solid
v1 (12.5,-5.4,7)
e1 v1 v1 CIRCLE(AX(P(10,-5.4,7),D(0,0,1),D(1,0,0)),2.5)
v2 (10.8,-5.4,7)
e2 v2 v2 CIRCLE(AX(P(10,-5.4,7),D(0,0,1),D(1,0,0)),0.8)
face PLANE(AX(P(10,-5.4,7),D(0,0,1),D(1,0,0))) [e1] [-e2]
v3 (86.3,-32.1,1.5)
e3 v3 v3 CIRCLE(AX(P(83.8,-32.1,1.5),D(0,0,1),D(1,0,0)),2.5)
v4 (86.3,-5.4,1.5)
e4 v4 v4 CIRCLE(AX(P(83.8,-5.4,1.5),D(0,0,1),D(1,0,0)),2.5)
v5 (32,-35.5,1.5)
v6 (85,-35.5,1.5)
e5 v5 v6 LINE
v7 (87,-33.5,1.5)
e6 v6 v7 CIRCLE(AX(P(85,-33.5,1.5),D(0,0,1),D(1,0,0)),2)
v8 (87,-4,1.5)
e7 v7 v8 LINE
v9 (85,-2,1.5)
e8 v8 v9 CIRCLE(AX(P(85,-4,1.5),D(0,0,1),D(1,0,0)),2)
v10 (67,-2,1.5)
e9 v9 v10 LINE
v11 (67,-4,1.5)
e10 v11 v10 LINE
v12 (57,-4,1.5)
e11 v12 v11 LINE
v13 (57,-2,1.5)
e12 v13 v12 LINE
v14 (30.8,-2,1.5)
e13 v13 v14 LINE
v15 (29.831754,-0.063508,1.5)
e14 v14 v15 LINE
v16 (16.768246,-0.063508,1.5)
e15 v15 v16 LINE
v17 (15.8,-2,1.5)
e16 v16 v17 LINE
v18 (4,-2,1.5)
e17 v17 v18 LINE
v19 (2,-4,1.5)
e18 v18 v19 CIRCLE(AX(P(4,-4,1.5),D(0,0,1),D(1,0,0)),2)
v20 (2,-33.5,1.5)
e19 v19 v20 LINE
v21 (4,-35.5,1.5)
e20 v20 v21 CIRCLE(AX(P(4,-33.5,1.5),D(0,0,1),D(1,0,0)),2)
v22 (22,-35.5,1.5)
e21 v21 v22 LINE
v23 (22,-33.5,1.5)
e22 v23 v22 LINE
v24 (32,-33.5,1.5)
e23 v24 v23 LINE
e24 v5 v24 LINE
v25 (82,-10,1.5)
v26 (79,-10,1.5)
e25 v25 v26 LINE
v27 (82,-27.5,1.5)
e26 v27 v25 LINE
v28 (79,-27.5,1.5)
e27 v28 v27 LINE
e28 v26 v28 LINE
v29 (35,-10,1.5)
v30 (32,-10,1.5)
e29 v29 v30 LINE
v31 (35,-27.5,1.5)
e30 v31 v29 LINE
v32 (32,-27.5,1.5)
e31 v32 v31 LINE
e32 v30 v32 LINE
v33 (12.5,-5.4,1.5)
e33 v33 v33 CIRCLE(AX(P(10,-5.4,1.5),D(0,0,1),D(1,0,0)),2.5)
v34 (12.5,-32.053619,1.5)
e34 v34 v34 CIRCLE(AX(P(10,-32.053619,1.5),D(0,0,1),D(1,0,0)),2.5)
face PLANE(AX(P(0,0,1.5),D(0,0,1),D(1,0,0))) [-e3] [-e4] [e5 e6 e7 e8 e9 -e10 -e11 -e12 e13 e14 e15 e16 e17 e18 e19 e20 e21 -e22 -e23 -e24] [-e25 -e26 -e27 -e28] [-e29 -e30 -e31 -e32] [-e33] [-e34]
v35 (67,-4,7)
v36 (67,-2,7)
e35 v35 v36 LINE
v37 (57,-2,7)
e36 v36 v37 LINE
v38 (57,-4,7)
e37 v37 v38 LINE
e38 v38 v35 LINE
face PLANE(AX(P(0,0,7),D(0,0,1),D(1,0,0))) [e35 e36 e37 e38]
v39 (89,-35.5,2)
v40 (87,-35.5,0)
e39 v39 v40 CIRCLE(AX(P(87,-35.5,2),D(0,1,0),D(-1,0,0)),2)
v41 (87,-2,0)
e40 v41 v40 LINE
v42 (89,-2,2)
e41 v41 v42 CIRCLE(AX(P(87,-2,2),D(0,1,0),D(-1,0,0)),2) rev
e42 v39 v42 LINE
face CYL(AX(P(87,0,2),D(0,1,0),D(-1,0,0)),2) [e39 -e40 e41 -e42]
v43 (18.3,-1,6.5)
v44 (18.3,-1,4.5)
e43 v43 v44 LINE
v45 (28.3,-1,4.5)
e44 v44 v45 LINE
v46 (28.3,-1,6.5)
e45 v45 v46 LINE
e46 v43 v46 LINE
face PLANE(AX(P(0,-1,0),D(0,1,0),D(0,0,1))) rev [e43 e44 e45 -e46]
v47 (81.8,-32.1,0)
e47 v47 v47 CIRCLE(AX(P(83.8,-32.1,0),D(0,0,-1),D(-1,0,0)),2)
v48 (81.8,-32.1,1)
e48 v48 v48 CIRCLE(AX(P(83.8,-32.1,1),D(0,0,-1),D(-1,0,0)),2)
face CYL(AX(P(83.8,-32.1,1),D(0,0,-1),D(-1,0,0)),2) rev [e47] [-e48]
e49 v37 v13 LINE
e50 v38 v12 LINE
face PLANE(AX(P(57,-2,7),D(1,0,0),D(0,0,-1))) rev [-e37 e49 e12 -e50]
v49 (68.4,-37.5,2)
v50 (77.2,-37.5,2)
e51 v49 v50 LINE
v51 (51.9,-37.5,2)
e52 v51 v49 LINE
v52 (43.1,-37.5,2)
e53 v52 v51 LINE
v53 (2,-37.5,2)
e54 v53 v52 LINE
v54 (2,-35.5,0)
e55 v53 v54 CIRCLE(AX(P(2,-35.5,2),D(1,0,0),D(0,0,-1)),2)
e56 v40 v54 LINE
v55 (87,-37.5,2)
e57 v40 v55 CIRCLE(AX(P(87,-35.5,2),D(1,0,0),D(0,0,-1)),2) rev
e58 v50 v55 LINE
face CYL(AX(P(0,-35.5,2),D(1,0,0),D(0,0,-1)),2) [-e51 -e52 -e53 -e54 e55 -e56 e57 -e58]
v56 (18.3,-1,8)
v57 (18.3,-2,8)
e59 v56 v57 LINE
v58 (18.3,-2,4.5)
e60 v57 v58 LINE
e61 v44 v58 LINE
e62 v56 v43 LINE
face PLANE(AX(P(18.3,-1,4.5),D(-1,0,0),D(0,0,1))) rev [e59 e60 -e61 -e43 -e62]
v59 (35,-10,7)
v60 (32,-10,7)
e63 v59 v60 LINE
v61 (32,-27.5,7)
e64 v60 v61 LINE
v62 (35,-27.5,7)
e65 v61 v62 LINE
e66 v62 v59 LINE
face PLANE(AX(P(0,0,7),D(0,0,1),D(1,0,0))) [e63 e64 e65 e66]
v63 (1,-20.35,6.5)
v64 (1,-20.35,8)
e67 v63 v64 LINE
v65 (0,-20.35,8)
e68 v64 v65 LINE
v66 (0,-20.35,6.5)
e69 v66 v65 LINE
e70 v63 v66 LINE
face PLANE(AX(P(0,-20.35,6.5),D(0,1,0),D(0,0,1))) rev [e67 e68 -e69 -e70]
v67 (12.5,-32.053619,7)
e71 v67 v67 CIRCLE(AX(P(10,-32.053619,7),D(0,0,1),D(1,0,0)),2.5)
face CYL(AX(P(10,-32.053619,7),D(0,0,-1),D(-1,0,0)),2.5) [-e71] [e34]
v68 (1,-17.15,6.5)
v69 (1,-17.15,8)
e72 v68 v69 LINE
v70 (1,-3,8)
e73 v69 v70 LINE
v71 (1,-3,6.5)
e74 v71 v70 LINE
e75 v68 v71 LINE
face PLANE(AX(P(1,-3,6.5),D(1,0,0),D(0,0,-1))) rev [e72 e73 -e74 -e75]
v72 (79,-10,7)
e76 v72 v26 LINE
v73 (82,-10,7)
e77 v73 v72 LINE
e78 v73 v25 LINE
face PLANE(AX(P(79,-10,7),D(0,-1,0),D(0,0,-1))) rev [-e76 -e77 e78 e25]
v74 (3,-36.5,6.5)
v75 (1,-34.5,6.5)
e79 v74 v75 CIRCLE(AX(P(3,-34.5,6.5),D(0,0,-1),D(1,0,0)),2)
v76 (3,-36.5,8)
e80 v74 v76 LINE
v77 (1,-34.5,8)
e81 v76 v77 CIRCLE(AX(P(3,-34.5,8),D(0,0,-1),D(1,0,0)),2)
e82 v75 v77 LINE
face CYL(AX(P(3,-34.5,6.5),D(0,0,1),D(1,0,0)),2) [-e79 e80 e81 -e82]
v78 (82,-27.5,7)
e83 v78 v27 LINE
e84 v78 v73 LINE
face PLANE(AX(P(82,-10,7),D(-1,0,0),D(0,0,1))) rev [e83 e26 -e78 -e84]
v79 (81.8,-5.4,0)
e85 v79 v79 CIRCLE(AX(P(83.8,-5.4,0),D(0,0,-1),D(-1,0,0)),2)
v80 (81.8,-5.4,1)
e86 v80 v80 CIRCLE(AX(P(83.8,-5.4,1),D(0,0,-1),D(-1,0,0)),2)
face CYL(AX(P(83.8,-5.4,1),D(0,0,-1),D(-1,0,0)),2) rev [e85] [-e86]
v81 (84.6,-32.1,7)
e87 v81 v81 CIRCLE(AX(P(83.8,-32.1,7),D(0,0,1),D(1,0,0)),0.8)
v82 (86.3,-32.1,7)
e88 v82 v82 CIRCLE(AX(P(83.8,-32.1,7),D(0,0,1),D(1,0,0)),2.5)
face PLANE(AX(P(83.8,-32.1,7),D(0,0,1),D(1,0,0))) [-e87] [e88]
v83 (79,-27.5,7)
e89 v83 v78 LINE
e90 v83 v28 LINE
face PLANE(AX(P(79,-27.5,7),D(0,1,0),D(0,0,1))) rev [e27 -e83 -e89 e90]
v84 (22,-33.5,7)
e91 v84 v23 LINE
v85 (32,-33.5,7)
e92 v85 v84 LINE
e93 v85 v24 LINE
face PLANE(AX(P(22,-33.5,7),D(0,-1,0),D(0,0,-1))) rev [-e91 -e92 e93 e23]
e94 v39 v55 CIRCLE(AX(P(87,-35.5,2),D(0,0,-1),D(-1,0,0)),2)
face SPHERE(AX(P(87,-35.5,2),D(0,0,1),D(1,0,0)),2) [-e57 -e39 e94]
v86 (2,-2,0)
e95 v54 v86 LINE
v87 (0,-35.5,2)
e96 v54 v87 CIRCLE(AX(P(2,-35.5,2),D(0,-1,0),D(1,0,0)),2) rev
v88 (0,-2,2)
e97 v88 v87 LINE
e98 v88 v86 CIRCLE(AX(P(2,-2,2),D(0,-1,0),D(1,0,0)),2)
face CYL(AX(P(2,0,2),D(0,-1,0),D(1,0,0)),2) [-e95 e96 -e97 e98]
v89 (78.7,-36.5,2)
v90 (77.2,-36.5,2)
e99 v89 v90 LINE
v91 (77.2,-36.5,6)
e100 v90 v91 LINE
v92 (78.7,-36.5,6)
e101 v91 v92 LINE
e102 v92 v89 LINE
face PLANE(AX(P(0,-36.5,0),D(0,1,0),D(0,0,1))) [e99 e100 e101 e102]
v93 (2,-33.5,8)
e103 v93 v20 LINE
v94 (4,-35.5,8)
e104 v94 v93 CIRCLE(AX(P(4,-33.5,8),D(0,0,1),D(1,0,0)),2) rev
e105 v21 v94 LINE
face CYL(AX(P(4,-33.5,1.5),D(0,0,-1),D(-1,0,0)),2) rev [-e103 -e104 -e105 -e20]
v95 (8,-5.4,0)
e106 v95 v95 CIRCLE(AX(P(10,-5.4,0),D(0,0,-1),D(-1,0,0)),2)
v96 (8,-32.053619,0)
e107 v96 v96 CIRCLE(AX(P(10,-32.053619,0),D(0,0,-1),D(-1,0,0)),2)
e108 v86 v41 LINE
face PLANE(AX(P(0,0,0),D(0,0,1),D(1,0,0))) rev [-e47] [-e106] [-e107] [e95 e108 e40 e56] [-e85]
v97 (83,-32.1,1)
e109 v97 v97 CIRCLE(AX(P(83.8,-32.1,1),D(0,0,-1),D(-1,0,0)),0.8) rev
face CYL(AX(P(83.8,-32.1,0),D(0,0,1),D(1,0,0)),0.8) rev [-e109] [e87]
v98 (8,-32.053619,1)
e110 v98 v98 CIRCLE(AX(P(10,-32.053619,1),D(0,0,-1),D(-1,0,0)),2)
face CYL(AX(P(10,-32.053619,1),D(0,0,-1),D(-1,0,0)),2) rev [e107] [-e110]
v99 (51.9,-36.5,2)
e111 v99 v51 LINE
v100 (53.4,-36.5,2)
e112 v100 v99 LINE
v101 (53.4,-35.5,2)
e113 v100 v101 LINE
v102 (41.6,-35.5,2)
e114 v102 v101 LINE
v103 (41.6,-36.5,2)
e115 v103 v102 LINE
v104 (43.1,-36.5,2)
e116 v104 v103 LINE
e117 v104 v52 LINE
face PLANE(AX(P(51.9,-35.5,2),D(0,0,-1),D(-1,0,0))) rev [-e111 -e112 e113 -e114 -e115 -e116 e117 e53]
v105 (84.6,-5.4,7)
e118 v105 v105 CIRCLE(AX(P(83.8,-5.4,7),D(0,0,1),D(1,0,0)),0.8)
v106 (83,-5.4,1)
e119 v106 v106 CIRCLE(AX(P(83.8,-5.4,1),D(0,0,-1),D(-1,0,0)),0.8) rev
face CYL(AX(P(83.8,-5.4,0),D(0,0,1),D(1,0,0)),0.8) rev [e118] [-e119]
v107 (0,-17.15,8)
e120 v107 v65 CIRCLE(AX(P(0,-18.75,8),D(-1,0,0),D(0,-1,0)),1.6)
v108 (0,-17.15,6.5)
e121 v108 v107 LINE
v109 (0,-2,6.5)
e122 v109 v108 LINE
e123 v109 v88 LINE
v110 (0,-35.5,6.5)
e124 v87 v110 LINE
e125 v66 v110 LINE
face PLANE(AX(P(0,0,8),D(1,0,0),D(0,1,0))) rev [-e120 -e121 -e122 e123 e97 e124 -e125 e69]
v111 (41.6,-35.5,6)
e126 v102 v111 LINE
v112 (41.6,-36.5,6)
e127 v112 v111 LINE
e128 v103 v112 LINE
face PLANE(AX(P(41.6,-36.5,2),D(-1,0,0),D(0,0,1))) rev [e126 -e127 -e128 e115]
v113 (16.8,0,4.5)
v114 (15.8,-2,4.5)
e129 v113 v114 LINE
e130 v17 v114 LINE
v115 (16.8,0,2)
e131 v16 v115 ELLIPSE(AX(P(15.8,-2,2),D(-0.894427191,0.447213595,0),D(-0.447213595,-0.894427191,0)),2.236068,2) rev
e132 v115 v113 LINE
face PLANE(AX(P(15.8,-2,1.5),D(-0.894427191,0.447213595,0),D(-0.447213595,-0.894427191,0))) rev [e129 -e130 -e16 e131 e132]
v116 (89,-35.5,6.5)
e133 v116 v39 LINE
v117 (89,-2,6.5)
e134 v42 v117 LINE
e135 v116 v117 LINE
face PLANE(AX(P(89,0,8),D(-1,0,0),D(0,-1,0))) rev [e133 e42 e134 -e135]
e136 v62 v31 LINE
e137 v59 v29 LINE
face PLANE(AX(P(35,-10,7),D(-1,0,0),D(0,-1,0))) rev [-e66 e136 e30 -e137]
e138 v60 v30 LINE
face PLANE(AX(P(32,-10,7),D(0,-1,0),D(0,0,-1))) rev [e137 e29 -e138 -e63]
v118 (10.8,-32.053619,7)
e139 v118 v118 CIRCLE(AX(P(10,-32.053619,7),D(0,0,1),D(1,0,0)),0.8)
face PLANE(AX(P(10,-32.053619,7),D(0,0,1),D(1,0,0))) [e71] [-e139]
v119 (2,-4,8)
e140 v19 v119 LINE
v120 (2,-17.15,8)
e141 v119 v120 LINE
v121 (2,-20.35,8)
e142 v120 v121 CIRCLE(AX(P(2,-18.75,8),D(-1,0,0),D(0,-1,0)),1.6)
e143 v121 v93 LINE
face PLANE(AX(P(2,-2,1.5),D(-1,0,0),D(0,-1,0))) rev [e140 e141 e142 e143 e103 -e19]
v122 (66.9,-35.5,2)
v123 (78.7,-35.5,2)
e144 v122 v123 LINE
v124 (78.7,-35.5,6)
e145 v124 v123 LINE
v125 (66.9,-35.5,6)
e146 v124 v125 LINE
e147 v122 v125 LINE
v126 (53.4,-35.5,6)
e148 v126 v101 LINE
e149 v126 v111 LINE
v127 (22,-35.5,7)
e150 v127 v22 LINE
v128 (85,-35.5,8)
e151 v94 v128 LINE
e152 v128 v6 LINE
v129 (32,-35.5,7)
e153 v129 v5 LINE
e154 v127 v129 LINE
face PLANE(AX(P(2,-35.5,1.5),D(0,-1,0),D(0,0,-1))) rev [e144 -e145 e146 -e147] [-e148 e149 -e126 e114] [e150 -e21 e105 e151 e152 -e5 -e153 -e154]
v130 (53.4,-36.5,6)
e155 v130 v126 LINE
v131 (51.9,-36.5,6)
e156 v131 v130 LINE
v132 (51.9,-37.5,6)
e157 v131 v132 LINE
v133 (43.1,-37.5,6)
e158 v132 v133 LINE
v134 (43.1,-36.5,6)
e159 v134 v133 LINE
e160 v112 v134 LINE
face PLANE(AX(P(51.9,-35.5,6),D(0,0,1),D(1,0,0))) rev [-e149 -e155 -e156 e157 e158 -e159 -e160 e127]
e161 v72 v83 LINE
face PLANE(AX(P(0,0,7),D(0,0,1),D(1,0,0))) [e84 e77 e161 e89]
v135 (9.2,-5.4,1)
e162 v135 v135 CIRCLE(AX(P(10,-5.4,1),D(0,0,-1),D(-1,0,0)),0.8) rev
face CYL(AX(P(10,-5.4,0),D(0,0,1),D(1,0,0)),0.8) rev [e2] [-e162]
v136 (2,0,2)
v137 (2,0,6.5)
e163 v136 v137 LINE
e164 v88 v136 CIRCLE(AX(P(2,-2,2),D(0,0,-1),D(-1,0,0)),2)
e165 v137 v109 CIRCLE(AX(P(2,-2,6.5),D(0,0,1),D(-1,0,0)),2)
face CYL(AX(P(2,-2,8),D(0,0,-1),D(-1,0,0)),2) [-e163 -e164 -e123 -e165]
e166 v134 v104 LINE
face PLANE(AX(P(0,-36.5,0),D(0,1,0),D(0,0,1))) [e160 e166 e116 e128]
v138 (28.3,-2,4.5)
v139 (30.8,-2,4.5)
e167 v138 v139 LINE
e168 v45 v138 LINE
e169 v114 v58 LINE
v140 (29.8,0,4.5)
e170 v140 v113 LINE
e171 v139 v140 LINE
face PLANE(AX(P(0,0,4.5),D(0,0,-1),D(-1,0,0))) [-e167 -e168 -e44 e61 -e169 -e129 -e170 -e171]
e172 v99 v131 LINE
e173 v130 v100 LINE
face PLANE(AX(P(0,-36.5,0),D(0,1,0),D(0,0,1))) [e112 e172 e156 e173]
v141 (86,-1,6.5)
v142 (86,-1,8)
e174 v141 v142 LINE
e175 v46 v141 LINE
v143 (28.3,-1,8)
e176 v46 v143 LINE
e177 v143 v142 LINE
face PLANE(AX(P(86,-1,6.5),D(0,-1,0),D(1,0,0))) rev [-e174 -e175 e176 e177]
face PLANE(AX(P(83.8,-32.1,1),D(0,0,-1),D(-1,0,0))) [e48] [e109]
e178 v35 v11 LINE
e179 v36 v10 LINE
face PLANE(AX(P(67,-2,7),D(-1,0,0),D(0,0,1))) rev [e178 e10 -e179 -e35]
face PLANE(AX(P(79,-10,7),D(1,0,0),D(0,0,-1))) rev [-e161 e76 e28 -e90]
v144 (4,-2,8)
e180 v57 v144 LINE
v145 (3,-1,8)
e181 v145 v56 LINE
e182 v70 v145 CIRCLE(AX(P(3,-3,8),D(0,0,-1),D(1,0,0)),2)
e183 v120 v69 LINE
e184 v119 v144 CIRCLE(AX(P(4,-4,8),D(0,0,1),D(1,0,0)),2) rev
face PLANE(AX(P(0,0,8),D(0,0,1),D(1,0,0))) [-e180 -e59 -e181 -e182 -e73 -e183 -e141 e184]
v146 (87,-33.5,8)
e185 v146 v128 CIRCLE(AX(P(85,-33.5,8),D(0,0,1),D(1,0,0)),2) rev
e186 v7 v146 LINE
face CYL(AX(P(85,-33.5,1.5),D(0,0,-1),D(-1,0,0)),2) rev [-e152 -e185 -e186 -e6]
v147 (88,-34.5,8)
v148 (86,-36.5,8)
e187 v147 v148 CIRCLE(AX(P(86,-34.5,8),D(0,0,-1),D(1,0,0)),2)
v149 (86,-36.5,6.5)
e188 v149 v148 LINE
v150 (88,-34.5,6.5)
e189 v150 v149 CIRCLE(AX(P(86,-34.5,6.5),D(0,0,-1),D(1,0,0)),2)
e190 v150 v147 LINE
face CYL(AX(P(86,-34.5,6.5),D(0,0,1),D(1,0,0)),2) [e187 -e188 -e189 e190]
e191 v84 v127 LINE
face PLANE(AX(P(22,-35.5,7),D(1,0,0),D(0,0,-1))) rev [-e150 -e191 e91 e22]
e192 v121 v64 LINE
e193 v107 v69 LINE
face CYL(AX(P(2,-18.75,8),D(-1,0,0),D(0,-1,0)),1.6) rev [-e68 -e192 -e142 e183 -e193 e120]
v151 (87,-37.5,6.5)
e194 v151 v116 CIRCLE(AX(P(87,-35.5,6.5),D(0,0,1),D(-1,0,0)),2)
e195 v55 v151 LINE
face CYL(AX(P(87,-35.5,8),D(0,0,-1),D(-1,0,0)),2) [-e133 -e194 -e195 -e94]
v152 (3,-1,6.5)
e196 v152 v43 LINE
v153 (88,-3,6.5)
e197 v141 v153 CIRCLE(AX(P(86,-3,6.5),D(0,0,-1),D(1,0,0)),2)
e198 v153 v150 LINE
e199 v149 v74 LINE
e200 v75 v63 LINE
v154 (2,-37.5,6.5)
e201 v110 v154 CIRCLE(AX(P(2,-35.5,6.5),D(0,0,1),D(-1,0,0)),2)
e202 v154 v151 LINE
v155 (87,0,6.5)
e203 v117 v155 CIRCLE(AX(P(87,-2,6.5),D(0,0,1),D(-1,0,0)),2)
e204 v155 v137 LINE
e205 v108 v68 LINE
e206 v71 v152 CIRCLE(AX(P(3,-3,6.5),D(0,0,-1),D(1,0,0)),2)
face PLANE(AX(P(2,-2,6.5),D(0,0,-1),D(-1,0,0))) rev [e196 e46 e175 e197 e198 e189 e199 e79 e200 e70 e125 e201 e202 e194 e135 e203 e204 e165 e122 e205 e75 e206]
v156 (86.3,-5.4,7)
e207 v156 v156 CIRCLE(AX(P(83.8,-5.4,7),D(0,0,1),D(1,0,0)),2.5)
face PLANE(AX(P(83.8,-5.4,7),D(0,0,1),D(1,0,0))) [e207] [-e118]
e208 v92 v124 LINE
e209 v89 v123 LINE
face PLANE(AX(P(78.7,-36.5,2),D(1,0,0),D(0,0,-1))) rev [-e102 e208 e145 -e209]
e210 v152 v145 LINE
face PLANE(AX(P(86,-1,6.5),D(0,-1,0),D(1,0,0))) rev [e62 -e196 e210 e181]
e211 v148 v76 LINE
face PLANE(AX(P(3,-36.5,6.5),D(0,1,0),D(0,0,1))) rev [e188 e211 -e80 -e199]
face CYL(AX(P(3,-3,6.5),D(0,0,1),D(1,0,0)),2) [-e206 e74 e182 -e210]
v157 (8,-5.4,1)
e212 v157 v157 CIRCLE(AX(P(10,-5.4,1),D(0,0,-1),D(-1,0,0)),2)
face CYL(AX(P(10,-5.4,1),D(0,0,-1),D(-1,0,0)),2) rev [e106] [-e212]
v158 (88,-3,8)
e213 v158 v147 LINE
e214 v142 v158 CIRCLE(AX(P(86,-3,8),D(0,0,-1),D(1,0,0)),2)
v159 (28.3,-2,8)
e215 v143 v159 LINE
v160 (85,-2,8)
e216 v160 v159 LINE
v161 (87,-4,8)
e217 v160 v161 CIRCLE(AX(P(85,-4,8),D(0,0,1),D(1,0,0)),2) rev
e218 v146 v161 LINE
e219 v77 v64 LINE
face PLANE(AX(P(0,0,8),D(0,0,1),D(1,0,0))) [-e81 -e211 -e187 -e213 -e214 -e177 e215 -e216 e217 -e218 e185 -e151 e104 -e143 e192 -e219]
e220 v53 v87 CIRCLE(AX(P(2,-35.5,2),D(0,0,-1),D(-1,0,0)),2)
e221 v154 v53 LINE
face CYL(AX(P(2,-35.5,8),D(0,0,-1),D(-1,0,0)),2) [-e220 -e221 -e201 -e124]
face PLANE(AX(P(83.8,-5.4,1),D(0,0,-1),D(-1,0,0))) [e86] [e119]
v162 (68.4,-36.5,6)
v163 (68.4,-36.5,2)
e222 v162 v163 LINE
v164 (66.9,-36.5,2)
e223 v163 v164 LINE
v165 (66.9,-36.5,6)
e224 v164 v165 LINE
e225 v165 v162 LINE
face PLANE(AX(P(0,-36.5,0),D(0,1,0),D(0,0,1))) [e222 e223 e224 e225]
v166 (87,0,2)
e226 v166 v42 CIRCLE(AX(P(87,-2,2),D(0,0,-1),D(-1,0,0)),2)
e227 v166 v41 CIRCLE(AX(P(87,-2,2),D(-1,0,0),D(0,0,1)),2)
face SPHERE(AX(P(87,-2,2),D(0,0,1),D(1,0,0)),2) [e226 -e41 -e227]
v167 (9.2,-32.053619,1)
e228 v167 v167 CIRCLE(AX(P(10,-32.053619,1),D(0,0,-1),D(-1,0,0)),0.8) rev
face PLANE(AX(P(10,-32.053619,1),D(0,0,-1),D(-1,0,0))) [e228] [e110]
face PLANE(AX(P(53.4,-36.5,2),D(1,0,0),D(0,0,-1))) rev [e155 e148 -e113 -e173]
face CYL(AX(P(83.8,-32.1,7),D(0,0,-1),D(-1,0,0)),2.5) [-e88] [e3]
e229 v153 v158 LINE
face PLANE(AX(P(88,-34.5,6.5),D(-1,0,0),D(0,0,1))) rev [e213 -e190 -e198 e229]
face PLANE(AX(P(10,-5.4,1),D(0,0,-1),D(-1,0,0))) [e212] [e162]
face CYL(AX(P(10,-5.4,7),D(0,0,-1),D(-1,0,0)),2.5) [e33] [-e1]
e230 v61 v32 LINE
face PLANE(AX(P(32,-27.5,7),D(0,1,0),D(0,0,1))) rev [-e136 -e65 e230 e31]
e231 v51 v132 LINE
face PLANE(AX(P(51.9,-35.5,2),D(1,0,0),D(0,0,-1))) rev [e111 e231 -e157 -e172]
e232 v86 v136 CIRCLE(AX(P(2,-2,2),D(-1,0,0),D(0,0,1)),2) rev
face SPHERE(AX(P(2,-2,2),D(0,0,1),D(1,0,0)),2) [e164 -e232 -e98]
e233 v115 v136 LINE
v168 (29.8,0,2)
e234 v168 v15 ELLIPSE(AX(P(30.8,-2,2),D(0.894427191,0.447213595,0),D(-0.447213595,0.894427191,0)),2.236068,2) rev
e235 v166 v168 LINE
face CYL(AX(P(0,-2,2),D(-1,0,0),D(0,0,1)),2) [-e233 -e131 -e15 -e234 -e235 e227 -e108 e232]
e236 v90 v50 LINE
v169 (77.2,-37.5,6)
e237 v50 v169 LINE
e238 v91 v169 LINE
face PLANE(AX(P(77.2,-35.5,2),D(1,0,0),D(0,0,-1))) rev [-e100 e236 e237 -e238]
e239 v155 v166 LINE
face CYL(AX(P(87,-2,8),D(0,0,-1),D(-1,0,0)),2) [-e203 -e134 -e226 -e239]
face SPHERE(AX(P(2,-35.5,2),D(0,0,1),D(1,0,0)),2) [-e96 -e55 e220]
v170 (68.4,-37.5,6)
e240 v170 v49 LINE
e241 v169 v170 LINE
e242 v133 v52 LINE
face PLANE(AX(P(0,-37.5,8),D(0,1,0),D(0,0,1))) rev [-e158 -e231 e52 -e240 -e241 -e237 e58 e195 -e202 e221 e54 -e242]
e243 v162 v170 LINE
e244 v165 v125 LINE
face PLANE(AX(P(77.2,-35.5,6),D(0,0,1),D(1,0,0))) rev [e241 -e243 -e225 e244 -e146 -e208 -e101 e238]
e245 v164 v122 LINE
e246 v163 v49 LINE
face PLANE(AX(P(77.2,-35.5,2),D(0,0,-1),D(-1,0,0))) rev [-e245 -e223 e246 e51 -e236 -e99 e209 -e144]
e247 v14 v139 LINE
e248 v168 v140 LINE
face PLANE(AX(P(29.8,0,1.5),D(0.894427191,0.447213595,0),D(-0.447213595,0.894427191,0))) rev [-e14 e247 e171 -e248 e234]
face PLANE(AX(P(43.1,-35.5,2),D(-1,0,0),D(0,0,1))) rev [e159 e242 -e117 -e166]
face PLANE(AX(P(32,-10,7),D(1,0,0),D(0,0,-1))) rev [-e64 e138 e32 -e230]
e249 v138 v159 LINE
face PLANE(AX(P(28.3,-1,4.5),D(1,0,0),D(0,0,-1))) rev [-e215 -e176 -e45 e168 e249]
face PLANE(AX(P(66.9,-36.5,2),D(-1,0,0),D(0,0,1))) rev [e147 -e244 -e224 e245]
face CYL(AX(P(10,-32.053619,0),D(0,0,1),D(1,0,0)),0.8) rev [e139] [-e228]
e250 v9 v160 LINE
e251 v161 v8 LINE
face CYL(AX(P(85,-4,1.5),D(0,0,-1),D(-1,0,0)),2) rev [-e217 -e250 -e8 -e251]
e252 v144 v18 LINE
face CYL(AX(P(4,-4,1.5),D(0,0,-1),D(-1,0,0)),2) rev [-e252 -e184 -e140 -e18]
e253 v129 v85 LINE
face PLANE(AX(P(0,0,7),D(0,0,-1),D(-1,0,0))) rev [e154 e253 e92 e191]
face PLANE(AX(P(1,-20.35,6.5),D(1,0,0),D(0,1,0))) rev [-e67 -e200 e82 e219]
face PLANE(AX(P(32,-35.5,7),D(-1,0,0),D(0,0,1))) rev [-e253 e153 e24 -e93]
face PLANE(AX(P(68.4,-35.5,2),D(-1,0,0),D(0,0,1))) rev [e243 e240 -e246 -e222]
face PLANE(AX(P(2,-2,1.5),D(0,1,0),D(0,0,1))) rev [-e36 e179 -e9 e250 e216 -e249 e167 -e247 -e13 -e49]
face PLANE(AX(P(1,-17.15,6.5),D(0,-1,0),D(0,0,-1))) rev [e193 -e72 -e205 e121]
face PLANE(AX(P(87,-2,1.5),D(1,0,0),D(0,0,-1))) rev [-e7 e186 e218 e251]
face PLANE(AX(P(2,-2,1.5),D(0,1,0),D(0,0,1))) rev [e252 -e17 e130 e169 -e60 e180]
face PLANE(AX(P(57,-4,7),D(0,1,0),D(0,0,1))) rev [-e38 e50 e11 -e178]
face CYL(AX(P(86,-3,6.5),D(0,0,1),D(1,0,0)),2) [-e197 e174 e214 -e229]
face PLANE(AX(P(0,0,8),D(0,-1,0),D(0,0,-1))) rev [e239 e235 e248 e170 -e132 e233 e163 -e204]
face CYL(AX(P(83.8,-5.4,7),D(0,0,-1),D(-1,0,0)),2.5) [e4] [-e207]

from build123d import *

# Parameters (mm, degrees)
SKETCH_1_W           = 89
SKETCH_1_H           = 37.5
EXTRUDE_1_DEPTH      = 8
SKETCH_2_W           = 85
SKETCH_2_H           = 33.5
CUT_EXTRUDE_1_DEPTH  = 6.5
FILLET_2_R           = 2
FILLET_3_R           = 2
FILLET_4_R           = 2
FILLET_5_R           = 2
FILLET_6_R           = 2
FILLET_7_R           = 2
SKETCH_3_R           = 2.5
SKETCH_3_W           = 10
SKETCH_3_H           = 2
SKETCH_3_W_2         = 3
SKETCH_3_H_2         = 17.5
EXTRUDE_2_DEPTH      = 5.5
SKETCH_4_R           = 0.8
CUT_EXTRUDE_2_DEPTH  = 97.831038412
SKETCH_5_R           = 0.8
CUT_EXTRUDE_3_DEPTH  = 97.831038412
SKETCH_6_R           = 0.8
CUT_EXTRUDE_4_DEPTH  = 97.831038412
SKETCH_8_R           = 0.8
CUT_EXTRUDE_5_DEPTH  = 97.831038412
SKETCH_9_R           = 2
CUT_EXTRUDE_6_DEPTH  = 1
CUT_EXTRUDE_7_DEPTH  = 2
SKETCH_11_W          = 8.8
SKETCH_11_H          = 4
CUT_EXTRUDE_8_DEPTH  = 2
SKETCH_12_W          = 11.8
SKETCH_12_H          = 4
CUT_EXTRUDE_9_DEPTH  = 1
CUT_EXTRUDE_10_DEPTH = 6.5
EXTRUDE_3_DEPTH      = 3.5
CUT_EXTRUDE_START    = -1.5
CUT_EXTRUDE_12_DEPTH = 1.5
SKETCH_18_W          = 10
SKETCH_18_H          = 3.5
CUT_EXTRUDE_15_DEPTH = 1


with BuildPart() as part:
    # 草图1 → 凸台-拉伸1 (new body)
    with BuildSketch(Plane.XY):
        with Locations((44.5, -18.75)):
            Rectangle(SKETCH_1_W, SKETCH_1_H)
    extrude(amount=EXTRUDE_1_DEPTH)

    # 草图2 → 切除-拉伸1 (cut)
    with BuildSketch(Plane.XY.offset(8)):
        with Locations((44.5, -18.75)):
            Rectangle(SKETCH_2_W, SKETCH_2_H)
    extrude(amount=-CUT_EXTRUDE_1_DEPTH, mode=Mode.SUBTRACT)

    # 圆角2
    fillet_2_edges = [part.edges().sort_by_distance(p)[0] for p in [
        (44.5, 0, 0),
        (89, -18.75, 0),
        (44.5, -37.5, 0),
        (0, -18.75, 0),
    ]]
    fillet(fillet_2_edges, radius=FILLET_2_R)

    # 圆角3
    fillet_3_edges = [part.edges().sort_by_distance(p)[0] for p in [
        (87, -35.5, 4.75),
    ]]
    fillet(fillet_3_edges, radius=FILLET_3_R)

    # 圆角4
    fillet_4_edges = [part.edges().sort_by_distance(p)[0] for p in [
        (87, -2, 4.75),
    ]]
    fillet(fillet_4_edges, radius=FILLET_4_R)

    # 圆角5
    fillet_5_edges = [part.edges().sort_by_distance(p)[0] for p in [
        (2, -35.5, 4.75),
    ]]
    fillet(fillet_5_edges, radius=FILLET_5_R)

    # 圆角6
    fillet_6_edges = [part.edges().sort_by_distance(p)[0] for p in [
        (2, -2, 4.75),
    ]]
    fillet(fillet_6_edges, radius=FILLET_6_R)

    # 圆角7
    # the kernel refuses this fillet: 2 mm, written as the material it takes off along each edge
    with BuildSketch(Plane(origin=(2, -2, 2), x_dir=(-1, 0, 0), z_dir=(0, 1, 0))) as fillet_7_piece_1_section:
        Polygon((0, 0), (FILLET_7_R, 0), (FILLET_7_R, -FILLET_7_R), (0, -FILLET_7_R), align=None)
    fillet_7_piece_1 = extrude(amount=FILLET_7_R, mode=Mode.PRIVATE)
    fillet_7_piece_1 = fillet_7_piece_1 - Plane(origin=(2, -2, 2), x_dir=(0.7071067811865475, 0, 0.7071067811865475), z_dir=(0, 1, 0)) * Sphere(FILLET_7_R, mode=Mode.PRIVATE)
    add(fillet_7_piece_1, mode=Mode.SUBTRACT)
    with BuildSketch(Plane(origin=(87, -2, 2), x_dir=(1, 0, 0), z_dir=(0, 1, 0))) as fillet_7_piece_2_section:
        Polygon((0, 0), (FILLET_7_R, 0), (FILLET_7_R, FILLET_7_R), (0, FILLET_7_R), align=None)
    fillet_7_piece_2 = extrude(amount=FILLET_7_R, mode=Mode.PRIVATE)
    fillet_7_piece_2 = fillet_7_piece_2 - Plane(origin=(87, -2, 2), x_dir=(-0.7071067811865475, 0, 0.7071067811865475), z_dir=(0, 1, 0)) * Sphere(FILLET_7_R, mode=Mode.PRIVATE)
    add(fillet_7_piece_2, mode=Mode.SUBTRACT)
    with BuildSketch(Plane(origin=(2, -35.5, 2), x_dir=(0, -1, 0), z_dir=(-1, 0, 0))) as fillet_7_piece_3_section:
        Polygon((0, 0), (FILLET_7_R, 0), (FILLET_7_R, -FILLET_7_R), (0, -FILLET_7_R), align=None)
    fillet_7_piece_3 = extrude(amount=FILLET_7_R, mode=Mode.PRIVATE)
    fillet_7_piece_3 = fillet_7_piece_3 - Plane(origin=(2, -35.5, 2), x_dir=(0, 0.7071067811865475, 0.7071067811865475), z_dir=(-1, 0, 0)) * Sphere(FILLET_7_R, mode=Mode.PRIVATE)
    add(fillet_7_piece_3, mode=Mode.SUBTRACT)
    with BuildSketch(Plane(origin=(87, -35.5, 2), x_dir=(0, -1, 0), z_dir=(1, 0, 0))) as fillet_7_piece_4_section:
        Polygon((0, 0), (FILLET_7_R, 0), (FILLET_7_R, FILLET_7_R), (0, FILLET_7_R), align=None)
    fillet_7_piece_4 = extrude(amount=FILLET_7_R, mode=Mode.PRIVATE)
    fillet_7_piece_4 = fillet_7_piece_4 - Plane(origin=(87, -35.5, 2), x_dir=(0, 0.7071067811865475, 0.7071067811865475), z_dir=(1, 0, 0)) * Sphere(FILLET_7_R, mode=Mode.PRIVATE)
    add(fillet_7_piece_4, mode=Mode.SUBTRACT)
    with BuildSketch(Plane(origin=(0, 0, 2), x_dir=(1, 0, 0), z_dir=(0, 0, 1)), Plane(origin=(0, -37.5, 2), x_dir=(0, 1, 0), z_dir=(0, 0, 1))) as fillet_7_piece_5:
        with BuildLine():
            CenterArc((FILLET_7_R, -FILLET_7_R), FILLET_7_R, 90, 90)
            Line((0, -FILLET_7_R), (0, 0))
            Line((0, 0), (FILLET_7_R, 0))
        make_face()
    extrude(amount=11, mode=Mode.SUBTRACT)
    with BuildSketch(Plane(origin=(89, 0, 2), x_dir=(-1, 0, 0), z_dir=(0, 0, 1)), Plane(origin=(89, -37.5, 2), x_dir=(0, 1, 0), z_dir=(0, 0, 1))) as fillet_7_piece_6:
        with BuildLine():
            CenterArc((FILLET_7_R, FILLET_7_R), FILLET_7_R, 180, 90)
            Line((0, FILLET_7_R), (0, 0))
            Line((0, 0), (FILLET_7_R, 0))
        make_face()
    extrude(amount=11, mode=Mode.SUBTRACT)

    # 草图3 → 凸台-拉伸2 (add)
    with BuildSketch(Plane.XY.offset(1.5)):
        with Locations((83.8, -5.4)):
            Circle(SKETCH_3_R)
        with Locations((83.8, -32.1)):
            Circle(SKETCH_3_R)
        with Locations((10, -5.4)):
            Circle(SKETCH_3_R)
        with Locations((10, -32.053618844)):
            Circle(SKETCH_3_R)
        with Locations((62, -3)):
            Rectangle(SKETCH_3_W, SKETCH_3_H)
        with Locations((27, -34.5)):
            Rectangle(SKETCH_3_W, SKETCH_3_H)
        with Locations((80.5, -18.75)):
            Rectangle(SKETCH_3_W_2, SKETCH_3_H_2)
        with Locations((33.5, -18.75)):
            Rectangle(SKETCH_3_W_2, SKETCH_3_H_2)
    extrude(amount=EXTRUDE_2_DEPTH)

    # 草图4 → 切除-拉伸2 (cut, through all)
    with BuildSketch(Plane.XY.offset(7)):
        with Locations((10, -5.4)):
            Circle(SKETCH_4_R)
    extrude(amount=-CUT_EXTRUDE_2_DEPTH, mode=Mode.SUBTRACT)

    # 草图5 → 切除-拉伸3 (cut, through all)
    with BuildSketch(Plane.XY.offset(7)):
        with Locations((83.8, -5.4)):
            Circle(SKETCH_5_R)
    extrude(amount=-CUT_EXTRUDE_3_DEPTH, mode=Mode.SUBTRACT)

    # 草图6 → 切除-拉伸4 (cut, through all)
    with BuildSketch(Plane.XY.offset(7)):
        with Locations((10, -32.053618844)):
            Circle(SKETCH_6_R)
    extrude(amount=-CUT_EXTRUDE_4_DEPTH, mode=Mode.SUBTRACT)

    # 草图8 → 切除-拉伸5 (cut, through all)
    with BuildSketch(Plane.XY.offset(7)):
        with Locations((83.8, -32.1)):
            Circle(SKETCH_8_R)
    extrude(amount=-CUT_EXTRUDE_5_DEPTH, mode=Mode.SUBTRACT)

    # 草图9 → 切除-拉伸6 (cut)
    with BuildSketch(Plane(origin=(0, 0, 0), x_dir=(-1, 0, 0), z_dir=(0, 0, -1))):
        with Locations((-83.8, -5.4)):
            Circle(SKETCH_9_R)
        with Locations((-10, -5.4)):
            Circle(SKETCH_9_R)
        with Locations((-10, -32.053618844)):
            Circle(SKETCH_9_R)
        with Locations((-83.8, -32.1)):
            Circle(SKETCH_9_R)
    extrude(amount=-CUT_EXTRUDE_6_DEPTH, mode=Mode.SUBTRACT)

    # 草图10 → 切除-拉伸7 (cut)
    with BuildSketch(Plane.ZY):
        with BuildLine():
            Line((8, -17.15), (8, -20.35))
            ThreePointArc((8, -20.35), (6.4, -18.75), (8, -17.15))
        make_face()
    extrude(amount=-CUT_EXTRUDE_7_DEPTH, mode=Mode.SUBTRACT)

    # 草图11 → 切除-拉伸8 (cut)
    with BuildSketch(Plane.XZ.offset(37.5)):
        with Locations((72.8, 4)):
            Rectangle(SKETCH_11_W, SKETCH_11_H)
        with Locations((47.5, 4)):
            Rectangle(SKETCH_11_W, SKETCH_11_H)
    extrude(amount=-CUT_EXTRUDE_8_DEPTH, mode=Mode.SUBTRACT)

    # 草图12 → 切除-拉伸9 (cut)
    with BuildSketch(Plane(origin=(0, -35.5, 0), x_dir=(1, 0, 0), z_dir=(0, 1, 0))):
        with Locations((72.8, -4)):
            Rectangle(SKETCH_12_W, SKETCH_12_H)
        with Locations((47.5, -4)):
            Rectangle(SKETCH_12_W, SKETCH_12_H)
    extrude(amount=-CUT_EXTRUDE_9_DEPTH, mode=Mode.SUBTRACT)

    # 草图13 → 切除-拉伸10 (cut)
    with BuildSketch(Plane.XY.offset(8)):
        Polygon((29.8, 0), (30.8, -2), (15.8, -2), (16.8, 0), align=None)
    extrude(amount=-CUT_EXTRUDE_10_DEPTH, mode=Mode.SUBTRACT)

    # 草图14 → 凸台-拉伸3 (add)
    with BuildSketch(Plane.XY.offset(8)):
        Polygon((15.8, -2), (16.8, 0), (29.8, 0), (30.8, -2), align=None)
    extrude(amount=-EXTRUDE_3_DEPTH)

    # 草图15 → 切除-拉伸12 (cut)
    with BuildSketch(Plane.XY.offset(8).offset(CUT_EXTRUDE_START)):
        with BuildLine():
            Line((2, 0), (87, 0))
            ThreePointArc((87, 0), (88.414213562, -0.585786438), (89, -2))
            Line((89, -2), (89, -35.5))
            ThreePointArc((89, -35.5), (88.414213562, -36.914213562), (87, -37.5))
            Line((87, -37.5), (2, -37.5))
            ThreePointArc((2, -37.5), (0.585786438, -36.914213562), (0, -35.5))
            Line((0, -35.5), (0, -20.35))
            Line((0, -20.35), (1, -20.35))
            Line((1, -20.35), (1, -34.5))
            ThreePointArc((1, -34.5), (1.585786438, -35.914213562), (3, -36.5))
            Line((3, -36.5), (86, -36.5))
            ThreePointArc((86, -36.5), (87.414213562, -35.914213562), (88, -34.5))
            Line((88, -34.5), (88, -3))
            ThreePointArc((88, -3), (87.414213562, -1.585786438), (86, -1))
            Line((86, -1), (3, -1))
            ThreePointArc((3, -1), (1.585786438, -1.585786438), (1, -3))
            Line((1, -3), (1, -17.15))
            Line((1, -17.15), (0, -17.15))
            Line((0, -17.15), (0, -2))
            ThreePointArc((0, -2), (0.585786438, -0.585786438), (2, 0))
        make_face()
    extrude(amount=CUT_EXTRUDE_12_DEPTH, mode=Mode.SUBTRACT)

    # 草图18 → 切除-拉伸15 (cut)
    with BuildSketch(Plane(origin=(0, -2, 0), x_dir=(-1, 0, 0), z_dir=(0, -1, 0))):
        with Locations((-23.3, -6.25)):
            Rectangle(SKETCH_18_W, SKETCH_18_H)
    extrude(amount=-CUT_EXTRUDE_15_DEPTH, mode=Mode.SUBTRACT)


solid = part.part
